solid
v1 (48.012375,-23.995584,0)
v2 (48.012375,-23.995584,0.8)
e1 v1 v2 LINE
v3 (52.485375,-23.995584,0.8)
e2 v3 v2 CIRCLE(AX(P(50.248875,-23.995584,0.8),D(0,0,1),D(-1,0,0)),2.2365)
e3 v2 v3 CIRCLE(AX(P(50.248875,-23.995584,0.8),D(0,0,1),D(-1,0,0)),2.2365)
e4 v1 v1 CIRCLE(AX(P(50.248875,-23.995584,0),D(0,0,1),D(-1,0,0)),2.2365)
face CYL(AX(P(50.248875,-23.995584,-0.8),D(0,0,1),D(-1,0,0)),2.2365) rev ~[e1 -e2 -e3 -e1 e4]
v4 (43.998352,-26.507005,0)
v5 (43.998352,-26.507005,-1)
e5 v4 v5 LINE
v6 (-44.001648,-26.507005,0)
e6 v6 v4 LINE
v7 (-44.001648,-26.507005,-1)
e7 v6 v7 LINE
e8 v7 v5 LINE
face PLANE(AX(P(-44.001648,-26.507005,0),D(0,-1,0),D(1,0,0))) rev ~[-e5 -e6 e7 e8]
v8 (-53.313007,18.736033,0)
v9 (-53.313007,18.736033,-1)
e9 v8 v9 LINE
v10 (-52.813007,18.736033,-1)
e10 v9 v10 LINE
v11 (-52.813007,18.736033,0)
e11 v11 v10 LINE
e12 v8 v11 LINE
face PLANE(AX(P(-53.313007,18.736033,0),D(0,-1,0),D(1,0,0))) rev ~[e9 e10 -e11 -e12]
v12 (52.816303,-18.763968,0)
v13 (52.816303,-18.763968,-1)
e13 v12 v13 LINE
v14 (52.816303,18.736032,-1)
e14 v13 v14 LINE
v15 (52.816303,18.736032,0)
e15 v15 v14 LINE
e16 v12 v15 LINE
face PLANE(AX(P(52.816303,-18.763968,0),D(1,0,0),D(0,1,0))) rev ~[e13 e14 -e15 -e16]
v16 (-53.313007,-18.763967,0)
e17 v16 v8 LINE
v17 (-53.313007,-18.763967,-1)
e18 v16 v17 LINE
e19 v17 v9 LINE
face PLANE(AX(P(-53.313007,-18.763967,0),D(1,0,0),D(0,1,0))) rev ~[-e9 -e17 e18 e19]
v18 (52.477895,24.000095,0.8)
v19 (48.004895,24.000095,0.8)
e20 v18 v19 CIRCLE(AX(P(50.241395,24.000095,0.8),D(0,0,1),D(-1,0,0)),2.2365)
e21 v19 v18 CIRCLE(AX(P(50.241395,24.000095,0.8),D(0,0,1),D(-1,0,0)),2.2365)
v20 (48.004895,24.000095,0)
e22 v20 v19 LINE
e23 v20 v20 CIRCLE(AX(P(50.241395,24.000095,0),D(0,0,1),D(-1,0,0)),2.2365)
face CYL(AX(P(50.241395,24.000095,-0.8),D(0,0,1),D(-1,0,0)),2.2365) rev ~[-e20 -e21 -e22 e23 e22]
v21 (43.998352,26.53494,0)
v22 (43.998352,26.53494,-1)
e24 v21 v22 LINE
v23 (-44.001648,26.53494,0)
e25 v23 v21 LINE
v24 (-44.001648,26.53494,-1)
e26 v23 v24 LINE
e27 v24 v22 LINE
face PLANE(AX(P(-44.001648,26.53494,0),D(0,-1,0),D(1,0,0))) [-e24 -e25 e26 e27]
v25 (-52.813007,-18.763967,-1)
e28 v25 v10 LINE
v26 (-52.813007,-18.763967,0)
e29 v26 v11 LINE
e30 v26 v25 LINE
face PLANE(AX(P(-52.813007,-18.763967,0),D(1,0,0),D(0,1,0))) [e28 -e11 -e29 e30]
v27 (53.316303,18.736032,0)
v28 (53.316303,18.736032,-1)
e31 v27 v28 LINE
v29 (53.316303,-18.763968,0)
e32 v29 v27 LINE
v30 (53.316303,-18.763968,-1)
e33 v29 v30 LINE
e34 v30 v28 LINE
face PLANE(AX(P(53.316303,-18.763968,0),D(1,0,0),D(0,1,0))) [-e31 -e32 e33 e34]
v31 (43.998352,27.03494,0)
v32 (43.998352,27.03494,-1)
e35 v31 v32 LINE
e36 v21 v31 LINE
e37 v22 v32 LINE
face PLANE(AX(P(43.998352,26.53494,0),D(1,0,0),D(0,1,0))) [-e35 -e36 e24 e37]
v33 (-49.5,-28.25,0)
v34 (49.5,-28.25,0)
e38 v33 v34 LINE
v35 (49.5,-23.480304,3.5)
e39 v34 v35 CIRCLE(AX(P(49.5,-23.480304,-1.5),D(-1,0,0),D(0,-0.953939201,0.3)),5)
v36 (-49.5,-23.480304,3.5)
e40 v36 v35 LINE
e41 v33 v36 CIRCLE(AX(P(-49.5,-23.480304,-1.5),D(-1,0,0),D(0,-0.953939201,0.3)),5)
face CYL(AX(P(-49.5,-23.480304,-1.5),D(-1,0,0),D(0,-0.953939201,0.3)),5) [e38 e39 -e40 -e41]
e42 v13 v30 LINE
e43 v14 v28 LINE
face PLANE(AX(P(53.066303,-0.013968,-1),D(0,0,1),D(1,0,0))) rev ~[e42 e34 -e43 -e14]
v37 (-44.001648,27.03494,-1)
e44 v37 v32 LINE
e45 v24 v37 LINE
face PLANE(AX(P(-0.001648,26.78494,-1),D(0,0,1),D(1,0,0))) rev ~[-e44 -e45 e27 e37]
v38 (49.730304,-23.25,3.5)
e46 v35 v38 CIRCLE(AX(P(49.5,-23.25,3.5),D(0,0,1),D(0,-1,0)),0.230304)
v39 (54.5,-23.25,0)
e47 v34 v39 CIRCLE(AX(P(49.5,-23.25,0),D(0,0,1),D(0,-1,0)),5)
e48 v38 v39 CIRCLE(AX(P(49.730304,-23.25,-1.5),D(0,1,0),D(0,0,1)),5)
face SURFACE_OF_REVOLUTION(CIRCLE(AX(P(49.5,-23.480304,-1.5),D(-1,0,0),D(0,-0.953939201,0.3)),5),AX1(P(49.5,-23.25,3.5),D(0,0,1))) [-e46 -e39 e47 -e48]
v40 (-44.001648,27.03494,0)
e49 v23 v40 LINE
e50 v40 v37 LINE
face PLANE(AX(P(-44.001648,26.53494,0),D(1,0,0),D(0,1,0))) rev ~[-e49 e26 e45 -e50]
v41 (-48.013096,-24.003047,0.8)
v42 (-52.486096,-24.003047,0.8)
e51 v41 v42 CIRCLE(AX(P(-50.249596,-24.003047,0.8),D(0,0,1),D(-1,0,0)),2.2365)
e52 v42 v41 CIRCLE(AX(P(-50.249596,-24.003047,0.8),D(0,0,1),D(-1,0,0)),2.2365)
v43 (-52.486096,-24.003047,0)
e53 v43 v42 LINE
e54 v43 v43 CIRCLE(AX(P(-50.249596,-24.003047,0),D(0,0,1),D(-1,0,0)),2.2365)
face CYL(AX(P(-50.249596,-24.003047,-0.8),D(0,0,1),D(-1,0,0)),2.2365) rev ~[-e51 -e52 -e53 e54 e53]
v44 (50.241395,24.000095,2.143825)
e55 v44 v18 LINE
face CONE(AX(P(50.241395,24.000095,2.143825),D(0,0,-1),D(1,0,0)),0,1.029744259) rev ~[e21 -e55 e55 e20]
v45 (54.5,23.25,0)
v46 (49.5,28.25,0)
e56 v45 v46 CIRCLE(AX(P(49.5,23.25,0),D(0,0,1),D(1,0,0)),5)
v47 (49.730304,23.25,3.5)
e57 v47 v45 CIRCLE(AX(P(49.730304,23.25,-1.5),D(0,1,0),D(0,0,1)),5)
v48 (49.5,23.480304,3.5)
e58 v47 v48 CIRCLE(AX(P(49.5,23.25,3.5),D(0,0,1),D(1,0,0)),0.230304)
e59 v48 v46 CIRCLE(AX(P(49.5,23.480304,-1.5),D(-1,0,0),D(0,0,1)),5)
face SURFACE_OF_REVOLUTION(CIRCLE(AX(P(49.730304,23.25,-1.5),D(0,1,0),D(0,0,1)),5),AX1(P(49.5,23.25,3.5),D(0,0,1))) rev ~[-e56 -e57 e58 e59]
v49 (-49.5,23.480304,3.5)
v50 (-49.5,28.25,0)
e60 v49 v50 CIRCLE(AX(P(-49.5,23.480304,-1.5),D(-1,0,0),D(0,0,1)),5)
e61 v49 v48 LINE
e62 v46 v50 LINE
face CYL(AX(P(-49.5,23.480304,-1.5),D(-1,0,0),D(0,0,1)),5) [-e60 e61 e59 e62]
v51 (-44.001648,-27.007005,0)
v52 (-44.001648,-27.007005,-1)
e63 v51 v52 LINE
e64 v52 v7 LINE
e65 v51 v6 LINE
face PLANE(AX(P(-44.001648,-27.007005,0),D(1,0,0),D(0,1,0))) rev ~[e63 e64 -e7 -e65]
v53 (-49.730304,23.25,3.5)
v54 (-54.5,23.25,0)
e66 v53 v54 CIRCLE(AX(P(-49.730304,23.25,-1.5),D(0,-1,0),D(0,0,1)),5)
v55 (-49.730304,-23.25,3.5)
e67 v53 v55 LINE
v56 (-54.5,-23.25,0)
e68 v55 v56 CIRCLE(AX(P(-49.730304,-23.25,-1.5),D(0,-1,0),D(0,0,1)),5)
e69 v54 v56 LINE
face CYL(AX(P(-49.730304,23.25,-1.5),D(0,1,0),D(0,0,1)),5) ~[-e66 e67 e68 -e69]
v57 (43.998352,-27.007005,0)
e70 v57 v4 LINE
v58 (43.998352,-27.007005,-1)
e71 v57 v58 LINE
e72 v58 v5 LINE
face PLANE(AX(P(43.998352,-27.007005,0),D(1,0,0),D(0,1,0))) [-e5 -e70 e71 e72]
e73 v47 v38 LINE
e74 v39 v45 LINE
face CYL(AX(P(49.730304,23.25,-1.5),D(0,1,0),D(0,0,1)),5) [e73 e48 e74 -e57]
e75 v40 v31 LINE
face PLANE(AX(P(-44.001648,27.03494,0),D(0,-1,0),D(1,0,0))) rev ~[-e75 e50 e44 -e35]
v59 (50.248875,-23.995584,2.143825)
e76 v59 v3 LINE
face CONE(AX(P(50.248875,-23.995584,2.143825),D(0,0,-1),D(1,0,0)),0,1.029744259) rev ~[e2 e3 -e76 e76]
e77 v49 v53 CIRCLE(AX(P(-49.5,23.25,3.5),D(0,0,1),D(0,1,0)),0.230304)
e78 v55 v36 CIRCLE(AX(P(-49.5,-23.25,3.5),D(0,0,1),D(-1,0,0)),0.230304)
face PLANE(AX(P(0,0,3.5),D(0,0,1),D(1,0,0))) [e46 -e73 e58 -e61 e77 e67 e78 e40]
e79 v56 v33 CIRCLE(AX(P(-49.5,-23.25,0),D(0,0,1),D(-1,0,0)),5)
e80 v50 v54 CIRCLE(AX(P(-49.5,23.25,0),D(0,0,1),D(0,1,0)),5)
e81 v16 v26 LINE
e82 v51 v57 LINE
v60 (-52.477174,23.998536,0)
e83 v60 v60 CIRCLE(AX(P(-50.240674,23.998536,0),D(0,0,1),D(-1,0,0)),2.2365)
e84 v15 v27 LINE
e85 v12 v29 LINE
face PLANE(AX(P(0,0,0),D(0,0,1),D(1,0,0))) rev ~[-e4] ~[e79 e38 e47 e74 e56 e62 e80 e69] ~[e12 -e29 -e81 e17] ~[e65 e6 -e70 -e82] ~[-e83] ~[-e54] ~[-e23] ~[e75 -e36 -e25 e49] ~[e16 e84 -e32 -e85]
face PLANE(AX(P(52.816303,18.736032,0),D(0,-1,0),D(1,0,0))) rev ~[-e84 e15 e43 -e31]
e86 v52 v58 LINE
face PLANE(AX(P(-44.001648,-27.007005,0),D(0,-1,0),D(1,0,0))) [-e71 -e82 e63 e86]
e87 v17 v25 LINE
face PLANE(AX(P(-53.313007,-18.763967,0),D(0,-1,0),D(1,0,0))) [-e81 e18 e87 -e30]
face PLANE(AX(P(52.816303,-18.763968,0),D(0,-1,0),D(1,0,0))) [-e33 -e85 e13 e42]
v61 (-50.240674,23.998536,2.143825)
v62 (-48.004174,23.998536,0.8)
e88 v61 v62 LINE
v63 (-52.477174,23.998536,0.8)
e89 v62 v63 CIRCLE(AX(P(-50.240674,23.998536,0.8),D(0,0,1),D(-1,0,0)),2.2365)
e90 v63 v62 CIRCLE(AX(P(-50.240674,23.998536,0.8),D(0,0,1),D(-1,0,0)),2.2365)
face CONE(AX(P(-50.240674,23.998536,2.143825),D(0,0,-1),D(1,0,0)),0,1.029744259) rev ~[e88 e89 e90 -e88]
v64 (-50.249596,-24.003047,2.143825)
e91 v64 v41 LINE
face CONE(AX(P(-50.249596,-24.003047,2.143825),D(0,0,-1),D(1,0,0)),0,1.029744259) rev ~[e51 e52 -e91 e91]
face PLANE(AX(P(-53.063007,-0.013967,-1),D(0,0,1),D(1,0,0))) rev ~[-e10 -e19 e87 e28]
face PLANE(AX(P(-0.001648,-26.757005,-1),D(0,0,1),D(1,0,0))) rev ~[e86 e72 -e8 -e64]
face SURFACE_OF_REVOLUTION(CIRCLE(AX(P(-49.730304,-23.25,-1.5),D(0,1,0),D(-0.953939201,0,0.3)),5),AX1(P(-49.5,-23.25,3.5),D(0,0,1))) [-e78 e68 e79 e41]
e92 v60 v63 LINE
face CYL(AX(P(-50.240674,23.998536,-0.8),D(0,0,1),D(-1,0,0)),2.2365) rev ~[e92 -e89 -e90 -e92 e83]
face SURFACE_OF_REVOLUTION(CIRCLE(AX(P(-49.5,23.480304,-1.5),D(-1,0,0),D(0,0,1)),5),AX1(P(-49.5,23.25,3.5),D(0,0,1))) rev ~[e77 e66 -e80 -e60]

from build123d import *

# Parameters (mm, degrees)
F1_DEPTH     = 3.5
F5_D         = 4.473
F5_DEPTH     = 0.8
F5_TIP       = 1.3438247745
F6_T1_DEPTH  = 99
F6_T3_DEPTH  = 46.5
F6_T6_ANGLE  = 90
F6_T8_ANGLE  = 90
F6_T10_ANGLE = 90
F6_T12_ANGLE = 90
F8_W         = 0.5
F8_H         = 37.5
F8_W_2       = 88
F8_H_2       = 0.5
F9_DEPTH     = 1


# Not quite as in the source:
# - a fillet or chamfer that OpenCascade refuses, or shapes differently, is made with other operations: its cross-section is extruded or revolved along the edge and cut away or added


with BuildPart() as f1:
    # F0 (on Top) → F1 (new body)
    with BuildSketch(Plane.XY):
        with BuildLine():
            Line((-49.5, -28.25), (49.5, -28.25))
            ThreePointArc((49.5, -28.25), (53.0355339059, -26.7855339059), (54.5, -23.25))
            Line((54.5, -23.25), (54.5, 23.25))
            ThreePointArc((54.5, 23.25), (53.0355339059, 26.7855339059), (49.5, 28.25))
            Line((49.5, 28.25), (-49.5, 28.25))
            ThreePointArc((-49.5, 28.25), (-53.0355339059, 26.7855339059), (-54.5, 23.25))
            Line((-54.5, 23.25), (-54.5, -23.25))
            ThreePointArc((-54.5, -23.25), (-53.0355339059, -26.7855339059), (-49.5, -28.25))
        make_face()
    extrude(amount=F1_DEPTH)

    # F5
    with Locations(Plane(origin=(0, 0, 0), x_dir=(1, 0, 0), z_dir=(0, 0, -1))):
        with Locations((-50.2406740561, -23.9985361695), (-50.2495961264, 24.0030474961), (50.2488752827, 23.995583877), (50.2413948998, -24.0000952035)):
            Hole(F5_D / 2, depth=F5_DEPTH)
            with Locations((0, 0, -(F5_DEPTH + F5_TIP / 2))):  # 118° drill point
                Cone(0, F5_D / 2, F5_TIP, mode=Mode.SUBTRACT)

    # F6: fillet of radius 5 on 1 edges, made by hand

    # F6_s2 → F6_t1 (cut)
    with BuildSketch(Plane.YZ.offset(-49.5)):
        with BuildLine():
            ThreePointArc((-28.25, 0), (-26.4383438845, 2.5311288741), (-23.4803039929, 3.5))
            Line((-23.4803039929, 3.5), (-28.25, 3.5))
            Line((-28.25, 3.5), (-28.25, 0))
        make_face()
        with BuildLine():
            ThreePointArc((23.4803039929, 3.5), (26.4383438845, 2.5311288741), (28.25, 0))
            Line((28.25, 0), (28.25, 3.5))
            Line((28.25, 3.5), (23.4803039929, 3.5))
        make_face()
    extrude(amount=F6_T1_DEPTH, mode=Mode.SUBTRACT)

    # F6_s4 → F6_t3 (cut)
    with BuildSketch(Plane.XZ.offset(-23.25)):
        with BuildLine():
            ThreePointArc((49.7303039929, 3.5), (52.6883438845, 2.5311288741), (54.5, 0))
            Line((54.5, 0), (54.5, 3.5))
            Line((54.5, 3.5), (49.7303039929, 3.5))
        make_face()
        with BuildLine():
            ThreePointArc((-49.7303039929, 3.5), (-52.6883438845, 2.5311288741), (-54.5, 0))
            Line((-54.5, 0), (-54.5, 3.5))
            Line((-54.5, 3.5), (-49.7303039929, 3.5))
        make_face()
    extrude(amount=F6_T3_DEPTH, mode=Mode.SUBTRACT)

    # F6_s5 → F6_t6 (revolve, cut)
    with BuildSketch(Plane.XZ.offset(23.25)):
        with BuildLine():
            ThreePointArc((-54.5, 0), (-52.6883438845, 2.5311288741), (-49.7303039929, 3.5))
            Line((-49.7303039929, 3.5), (-54.5, 3.5))
            Line((-54.5, 3.5), (-54.5, 0))
        make_face()
    revolve(axis=Axis((-49.5, -23.25, 3.5), (0, 0, 1)), revolution_arc=F6_T6_ANGLE, mode=Mode.SUBTRACT)

    # F6_s7 → F6_t8 (revolve, cut)
    with BuildSketch(Plane.YZ.offset(49.5)):
        with BuildLine():
            ThreePointArc((-28.25, 0), (-26.4383438845, 2.5311288741), (-23.4803039929, 3.5))
            Line((-23.4803039929, 3.5), (-28.25, 3.5))
            Line((-28.25, 3.5), (-28.25, 0))
        make_face()
    revolve(axis=Axis((49.5, -23.25, 3.5), (0, 0, 1)), revolution_arc=F6_T8_ANGLE, mode=Mode.SUBTRACT)

    # F6_s9 → F6_t10 (revolve, cut)
    with BuildSketch(Plane.XZ.offset(-23.25)):
        with BuildLine():
            ThreePointArc((49.7303039929, 3.5), (52.6883438845, 2.5311288741), (54.5, 0))
            Line((54.5, 0), (54.5, 3.5))
            Line((54.5, 3.5), (49.7303039929, 3.5))
        make_face()
    revolve(axis=Axis((49.5, 23.25, 3.5), (0, 0, 1)), revolution_arc=F6_T10_ANGLE, mode=Mode.SUBTRACT)

    # F6_s11 → F6_t12 (revolve, cut)
    with BuildSketch(Plane.YZ.offset(-49.5)):
        with BuildLine():
            ThreePointArc((23.4803039929, 3.5), (26.4383438845, 2.5311288741), (28.25, 0))
            Line((28.25, 0), (28.25, 3.5))
            Line((28.25, 3.5), (23.4803039929, 3.5))
        make_face()
    revolve(axis=Axis((-49.5, 23.25, 3.5), (0, 0, 1)), revolution_arc=F6_T12_ANGLE, mode=Mode.SUBTRACT)

    # F8 (on Top) → F9 (join)
    with BuildSketch(Plane.XY):
        with Locations((-53.0630070642, -0.0139670707)):
            Rectangle(F8_W, F8_H)
        with Locations((-0.0016481951, -26.7570052035)):
            Rectangle(F8_W_2, F8_H_2)
        with Locations((53.0663034543, -0.0139678158)):
            Rectangle(F8_W, F8_H)
        with Locations((-0.0016481951, 26.78494009)):
            Rectangle(F8_W_2, F8_H_2)
    extrude(amount=-F9_DEPTH)


solid = f1.part
